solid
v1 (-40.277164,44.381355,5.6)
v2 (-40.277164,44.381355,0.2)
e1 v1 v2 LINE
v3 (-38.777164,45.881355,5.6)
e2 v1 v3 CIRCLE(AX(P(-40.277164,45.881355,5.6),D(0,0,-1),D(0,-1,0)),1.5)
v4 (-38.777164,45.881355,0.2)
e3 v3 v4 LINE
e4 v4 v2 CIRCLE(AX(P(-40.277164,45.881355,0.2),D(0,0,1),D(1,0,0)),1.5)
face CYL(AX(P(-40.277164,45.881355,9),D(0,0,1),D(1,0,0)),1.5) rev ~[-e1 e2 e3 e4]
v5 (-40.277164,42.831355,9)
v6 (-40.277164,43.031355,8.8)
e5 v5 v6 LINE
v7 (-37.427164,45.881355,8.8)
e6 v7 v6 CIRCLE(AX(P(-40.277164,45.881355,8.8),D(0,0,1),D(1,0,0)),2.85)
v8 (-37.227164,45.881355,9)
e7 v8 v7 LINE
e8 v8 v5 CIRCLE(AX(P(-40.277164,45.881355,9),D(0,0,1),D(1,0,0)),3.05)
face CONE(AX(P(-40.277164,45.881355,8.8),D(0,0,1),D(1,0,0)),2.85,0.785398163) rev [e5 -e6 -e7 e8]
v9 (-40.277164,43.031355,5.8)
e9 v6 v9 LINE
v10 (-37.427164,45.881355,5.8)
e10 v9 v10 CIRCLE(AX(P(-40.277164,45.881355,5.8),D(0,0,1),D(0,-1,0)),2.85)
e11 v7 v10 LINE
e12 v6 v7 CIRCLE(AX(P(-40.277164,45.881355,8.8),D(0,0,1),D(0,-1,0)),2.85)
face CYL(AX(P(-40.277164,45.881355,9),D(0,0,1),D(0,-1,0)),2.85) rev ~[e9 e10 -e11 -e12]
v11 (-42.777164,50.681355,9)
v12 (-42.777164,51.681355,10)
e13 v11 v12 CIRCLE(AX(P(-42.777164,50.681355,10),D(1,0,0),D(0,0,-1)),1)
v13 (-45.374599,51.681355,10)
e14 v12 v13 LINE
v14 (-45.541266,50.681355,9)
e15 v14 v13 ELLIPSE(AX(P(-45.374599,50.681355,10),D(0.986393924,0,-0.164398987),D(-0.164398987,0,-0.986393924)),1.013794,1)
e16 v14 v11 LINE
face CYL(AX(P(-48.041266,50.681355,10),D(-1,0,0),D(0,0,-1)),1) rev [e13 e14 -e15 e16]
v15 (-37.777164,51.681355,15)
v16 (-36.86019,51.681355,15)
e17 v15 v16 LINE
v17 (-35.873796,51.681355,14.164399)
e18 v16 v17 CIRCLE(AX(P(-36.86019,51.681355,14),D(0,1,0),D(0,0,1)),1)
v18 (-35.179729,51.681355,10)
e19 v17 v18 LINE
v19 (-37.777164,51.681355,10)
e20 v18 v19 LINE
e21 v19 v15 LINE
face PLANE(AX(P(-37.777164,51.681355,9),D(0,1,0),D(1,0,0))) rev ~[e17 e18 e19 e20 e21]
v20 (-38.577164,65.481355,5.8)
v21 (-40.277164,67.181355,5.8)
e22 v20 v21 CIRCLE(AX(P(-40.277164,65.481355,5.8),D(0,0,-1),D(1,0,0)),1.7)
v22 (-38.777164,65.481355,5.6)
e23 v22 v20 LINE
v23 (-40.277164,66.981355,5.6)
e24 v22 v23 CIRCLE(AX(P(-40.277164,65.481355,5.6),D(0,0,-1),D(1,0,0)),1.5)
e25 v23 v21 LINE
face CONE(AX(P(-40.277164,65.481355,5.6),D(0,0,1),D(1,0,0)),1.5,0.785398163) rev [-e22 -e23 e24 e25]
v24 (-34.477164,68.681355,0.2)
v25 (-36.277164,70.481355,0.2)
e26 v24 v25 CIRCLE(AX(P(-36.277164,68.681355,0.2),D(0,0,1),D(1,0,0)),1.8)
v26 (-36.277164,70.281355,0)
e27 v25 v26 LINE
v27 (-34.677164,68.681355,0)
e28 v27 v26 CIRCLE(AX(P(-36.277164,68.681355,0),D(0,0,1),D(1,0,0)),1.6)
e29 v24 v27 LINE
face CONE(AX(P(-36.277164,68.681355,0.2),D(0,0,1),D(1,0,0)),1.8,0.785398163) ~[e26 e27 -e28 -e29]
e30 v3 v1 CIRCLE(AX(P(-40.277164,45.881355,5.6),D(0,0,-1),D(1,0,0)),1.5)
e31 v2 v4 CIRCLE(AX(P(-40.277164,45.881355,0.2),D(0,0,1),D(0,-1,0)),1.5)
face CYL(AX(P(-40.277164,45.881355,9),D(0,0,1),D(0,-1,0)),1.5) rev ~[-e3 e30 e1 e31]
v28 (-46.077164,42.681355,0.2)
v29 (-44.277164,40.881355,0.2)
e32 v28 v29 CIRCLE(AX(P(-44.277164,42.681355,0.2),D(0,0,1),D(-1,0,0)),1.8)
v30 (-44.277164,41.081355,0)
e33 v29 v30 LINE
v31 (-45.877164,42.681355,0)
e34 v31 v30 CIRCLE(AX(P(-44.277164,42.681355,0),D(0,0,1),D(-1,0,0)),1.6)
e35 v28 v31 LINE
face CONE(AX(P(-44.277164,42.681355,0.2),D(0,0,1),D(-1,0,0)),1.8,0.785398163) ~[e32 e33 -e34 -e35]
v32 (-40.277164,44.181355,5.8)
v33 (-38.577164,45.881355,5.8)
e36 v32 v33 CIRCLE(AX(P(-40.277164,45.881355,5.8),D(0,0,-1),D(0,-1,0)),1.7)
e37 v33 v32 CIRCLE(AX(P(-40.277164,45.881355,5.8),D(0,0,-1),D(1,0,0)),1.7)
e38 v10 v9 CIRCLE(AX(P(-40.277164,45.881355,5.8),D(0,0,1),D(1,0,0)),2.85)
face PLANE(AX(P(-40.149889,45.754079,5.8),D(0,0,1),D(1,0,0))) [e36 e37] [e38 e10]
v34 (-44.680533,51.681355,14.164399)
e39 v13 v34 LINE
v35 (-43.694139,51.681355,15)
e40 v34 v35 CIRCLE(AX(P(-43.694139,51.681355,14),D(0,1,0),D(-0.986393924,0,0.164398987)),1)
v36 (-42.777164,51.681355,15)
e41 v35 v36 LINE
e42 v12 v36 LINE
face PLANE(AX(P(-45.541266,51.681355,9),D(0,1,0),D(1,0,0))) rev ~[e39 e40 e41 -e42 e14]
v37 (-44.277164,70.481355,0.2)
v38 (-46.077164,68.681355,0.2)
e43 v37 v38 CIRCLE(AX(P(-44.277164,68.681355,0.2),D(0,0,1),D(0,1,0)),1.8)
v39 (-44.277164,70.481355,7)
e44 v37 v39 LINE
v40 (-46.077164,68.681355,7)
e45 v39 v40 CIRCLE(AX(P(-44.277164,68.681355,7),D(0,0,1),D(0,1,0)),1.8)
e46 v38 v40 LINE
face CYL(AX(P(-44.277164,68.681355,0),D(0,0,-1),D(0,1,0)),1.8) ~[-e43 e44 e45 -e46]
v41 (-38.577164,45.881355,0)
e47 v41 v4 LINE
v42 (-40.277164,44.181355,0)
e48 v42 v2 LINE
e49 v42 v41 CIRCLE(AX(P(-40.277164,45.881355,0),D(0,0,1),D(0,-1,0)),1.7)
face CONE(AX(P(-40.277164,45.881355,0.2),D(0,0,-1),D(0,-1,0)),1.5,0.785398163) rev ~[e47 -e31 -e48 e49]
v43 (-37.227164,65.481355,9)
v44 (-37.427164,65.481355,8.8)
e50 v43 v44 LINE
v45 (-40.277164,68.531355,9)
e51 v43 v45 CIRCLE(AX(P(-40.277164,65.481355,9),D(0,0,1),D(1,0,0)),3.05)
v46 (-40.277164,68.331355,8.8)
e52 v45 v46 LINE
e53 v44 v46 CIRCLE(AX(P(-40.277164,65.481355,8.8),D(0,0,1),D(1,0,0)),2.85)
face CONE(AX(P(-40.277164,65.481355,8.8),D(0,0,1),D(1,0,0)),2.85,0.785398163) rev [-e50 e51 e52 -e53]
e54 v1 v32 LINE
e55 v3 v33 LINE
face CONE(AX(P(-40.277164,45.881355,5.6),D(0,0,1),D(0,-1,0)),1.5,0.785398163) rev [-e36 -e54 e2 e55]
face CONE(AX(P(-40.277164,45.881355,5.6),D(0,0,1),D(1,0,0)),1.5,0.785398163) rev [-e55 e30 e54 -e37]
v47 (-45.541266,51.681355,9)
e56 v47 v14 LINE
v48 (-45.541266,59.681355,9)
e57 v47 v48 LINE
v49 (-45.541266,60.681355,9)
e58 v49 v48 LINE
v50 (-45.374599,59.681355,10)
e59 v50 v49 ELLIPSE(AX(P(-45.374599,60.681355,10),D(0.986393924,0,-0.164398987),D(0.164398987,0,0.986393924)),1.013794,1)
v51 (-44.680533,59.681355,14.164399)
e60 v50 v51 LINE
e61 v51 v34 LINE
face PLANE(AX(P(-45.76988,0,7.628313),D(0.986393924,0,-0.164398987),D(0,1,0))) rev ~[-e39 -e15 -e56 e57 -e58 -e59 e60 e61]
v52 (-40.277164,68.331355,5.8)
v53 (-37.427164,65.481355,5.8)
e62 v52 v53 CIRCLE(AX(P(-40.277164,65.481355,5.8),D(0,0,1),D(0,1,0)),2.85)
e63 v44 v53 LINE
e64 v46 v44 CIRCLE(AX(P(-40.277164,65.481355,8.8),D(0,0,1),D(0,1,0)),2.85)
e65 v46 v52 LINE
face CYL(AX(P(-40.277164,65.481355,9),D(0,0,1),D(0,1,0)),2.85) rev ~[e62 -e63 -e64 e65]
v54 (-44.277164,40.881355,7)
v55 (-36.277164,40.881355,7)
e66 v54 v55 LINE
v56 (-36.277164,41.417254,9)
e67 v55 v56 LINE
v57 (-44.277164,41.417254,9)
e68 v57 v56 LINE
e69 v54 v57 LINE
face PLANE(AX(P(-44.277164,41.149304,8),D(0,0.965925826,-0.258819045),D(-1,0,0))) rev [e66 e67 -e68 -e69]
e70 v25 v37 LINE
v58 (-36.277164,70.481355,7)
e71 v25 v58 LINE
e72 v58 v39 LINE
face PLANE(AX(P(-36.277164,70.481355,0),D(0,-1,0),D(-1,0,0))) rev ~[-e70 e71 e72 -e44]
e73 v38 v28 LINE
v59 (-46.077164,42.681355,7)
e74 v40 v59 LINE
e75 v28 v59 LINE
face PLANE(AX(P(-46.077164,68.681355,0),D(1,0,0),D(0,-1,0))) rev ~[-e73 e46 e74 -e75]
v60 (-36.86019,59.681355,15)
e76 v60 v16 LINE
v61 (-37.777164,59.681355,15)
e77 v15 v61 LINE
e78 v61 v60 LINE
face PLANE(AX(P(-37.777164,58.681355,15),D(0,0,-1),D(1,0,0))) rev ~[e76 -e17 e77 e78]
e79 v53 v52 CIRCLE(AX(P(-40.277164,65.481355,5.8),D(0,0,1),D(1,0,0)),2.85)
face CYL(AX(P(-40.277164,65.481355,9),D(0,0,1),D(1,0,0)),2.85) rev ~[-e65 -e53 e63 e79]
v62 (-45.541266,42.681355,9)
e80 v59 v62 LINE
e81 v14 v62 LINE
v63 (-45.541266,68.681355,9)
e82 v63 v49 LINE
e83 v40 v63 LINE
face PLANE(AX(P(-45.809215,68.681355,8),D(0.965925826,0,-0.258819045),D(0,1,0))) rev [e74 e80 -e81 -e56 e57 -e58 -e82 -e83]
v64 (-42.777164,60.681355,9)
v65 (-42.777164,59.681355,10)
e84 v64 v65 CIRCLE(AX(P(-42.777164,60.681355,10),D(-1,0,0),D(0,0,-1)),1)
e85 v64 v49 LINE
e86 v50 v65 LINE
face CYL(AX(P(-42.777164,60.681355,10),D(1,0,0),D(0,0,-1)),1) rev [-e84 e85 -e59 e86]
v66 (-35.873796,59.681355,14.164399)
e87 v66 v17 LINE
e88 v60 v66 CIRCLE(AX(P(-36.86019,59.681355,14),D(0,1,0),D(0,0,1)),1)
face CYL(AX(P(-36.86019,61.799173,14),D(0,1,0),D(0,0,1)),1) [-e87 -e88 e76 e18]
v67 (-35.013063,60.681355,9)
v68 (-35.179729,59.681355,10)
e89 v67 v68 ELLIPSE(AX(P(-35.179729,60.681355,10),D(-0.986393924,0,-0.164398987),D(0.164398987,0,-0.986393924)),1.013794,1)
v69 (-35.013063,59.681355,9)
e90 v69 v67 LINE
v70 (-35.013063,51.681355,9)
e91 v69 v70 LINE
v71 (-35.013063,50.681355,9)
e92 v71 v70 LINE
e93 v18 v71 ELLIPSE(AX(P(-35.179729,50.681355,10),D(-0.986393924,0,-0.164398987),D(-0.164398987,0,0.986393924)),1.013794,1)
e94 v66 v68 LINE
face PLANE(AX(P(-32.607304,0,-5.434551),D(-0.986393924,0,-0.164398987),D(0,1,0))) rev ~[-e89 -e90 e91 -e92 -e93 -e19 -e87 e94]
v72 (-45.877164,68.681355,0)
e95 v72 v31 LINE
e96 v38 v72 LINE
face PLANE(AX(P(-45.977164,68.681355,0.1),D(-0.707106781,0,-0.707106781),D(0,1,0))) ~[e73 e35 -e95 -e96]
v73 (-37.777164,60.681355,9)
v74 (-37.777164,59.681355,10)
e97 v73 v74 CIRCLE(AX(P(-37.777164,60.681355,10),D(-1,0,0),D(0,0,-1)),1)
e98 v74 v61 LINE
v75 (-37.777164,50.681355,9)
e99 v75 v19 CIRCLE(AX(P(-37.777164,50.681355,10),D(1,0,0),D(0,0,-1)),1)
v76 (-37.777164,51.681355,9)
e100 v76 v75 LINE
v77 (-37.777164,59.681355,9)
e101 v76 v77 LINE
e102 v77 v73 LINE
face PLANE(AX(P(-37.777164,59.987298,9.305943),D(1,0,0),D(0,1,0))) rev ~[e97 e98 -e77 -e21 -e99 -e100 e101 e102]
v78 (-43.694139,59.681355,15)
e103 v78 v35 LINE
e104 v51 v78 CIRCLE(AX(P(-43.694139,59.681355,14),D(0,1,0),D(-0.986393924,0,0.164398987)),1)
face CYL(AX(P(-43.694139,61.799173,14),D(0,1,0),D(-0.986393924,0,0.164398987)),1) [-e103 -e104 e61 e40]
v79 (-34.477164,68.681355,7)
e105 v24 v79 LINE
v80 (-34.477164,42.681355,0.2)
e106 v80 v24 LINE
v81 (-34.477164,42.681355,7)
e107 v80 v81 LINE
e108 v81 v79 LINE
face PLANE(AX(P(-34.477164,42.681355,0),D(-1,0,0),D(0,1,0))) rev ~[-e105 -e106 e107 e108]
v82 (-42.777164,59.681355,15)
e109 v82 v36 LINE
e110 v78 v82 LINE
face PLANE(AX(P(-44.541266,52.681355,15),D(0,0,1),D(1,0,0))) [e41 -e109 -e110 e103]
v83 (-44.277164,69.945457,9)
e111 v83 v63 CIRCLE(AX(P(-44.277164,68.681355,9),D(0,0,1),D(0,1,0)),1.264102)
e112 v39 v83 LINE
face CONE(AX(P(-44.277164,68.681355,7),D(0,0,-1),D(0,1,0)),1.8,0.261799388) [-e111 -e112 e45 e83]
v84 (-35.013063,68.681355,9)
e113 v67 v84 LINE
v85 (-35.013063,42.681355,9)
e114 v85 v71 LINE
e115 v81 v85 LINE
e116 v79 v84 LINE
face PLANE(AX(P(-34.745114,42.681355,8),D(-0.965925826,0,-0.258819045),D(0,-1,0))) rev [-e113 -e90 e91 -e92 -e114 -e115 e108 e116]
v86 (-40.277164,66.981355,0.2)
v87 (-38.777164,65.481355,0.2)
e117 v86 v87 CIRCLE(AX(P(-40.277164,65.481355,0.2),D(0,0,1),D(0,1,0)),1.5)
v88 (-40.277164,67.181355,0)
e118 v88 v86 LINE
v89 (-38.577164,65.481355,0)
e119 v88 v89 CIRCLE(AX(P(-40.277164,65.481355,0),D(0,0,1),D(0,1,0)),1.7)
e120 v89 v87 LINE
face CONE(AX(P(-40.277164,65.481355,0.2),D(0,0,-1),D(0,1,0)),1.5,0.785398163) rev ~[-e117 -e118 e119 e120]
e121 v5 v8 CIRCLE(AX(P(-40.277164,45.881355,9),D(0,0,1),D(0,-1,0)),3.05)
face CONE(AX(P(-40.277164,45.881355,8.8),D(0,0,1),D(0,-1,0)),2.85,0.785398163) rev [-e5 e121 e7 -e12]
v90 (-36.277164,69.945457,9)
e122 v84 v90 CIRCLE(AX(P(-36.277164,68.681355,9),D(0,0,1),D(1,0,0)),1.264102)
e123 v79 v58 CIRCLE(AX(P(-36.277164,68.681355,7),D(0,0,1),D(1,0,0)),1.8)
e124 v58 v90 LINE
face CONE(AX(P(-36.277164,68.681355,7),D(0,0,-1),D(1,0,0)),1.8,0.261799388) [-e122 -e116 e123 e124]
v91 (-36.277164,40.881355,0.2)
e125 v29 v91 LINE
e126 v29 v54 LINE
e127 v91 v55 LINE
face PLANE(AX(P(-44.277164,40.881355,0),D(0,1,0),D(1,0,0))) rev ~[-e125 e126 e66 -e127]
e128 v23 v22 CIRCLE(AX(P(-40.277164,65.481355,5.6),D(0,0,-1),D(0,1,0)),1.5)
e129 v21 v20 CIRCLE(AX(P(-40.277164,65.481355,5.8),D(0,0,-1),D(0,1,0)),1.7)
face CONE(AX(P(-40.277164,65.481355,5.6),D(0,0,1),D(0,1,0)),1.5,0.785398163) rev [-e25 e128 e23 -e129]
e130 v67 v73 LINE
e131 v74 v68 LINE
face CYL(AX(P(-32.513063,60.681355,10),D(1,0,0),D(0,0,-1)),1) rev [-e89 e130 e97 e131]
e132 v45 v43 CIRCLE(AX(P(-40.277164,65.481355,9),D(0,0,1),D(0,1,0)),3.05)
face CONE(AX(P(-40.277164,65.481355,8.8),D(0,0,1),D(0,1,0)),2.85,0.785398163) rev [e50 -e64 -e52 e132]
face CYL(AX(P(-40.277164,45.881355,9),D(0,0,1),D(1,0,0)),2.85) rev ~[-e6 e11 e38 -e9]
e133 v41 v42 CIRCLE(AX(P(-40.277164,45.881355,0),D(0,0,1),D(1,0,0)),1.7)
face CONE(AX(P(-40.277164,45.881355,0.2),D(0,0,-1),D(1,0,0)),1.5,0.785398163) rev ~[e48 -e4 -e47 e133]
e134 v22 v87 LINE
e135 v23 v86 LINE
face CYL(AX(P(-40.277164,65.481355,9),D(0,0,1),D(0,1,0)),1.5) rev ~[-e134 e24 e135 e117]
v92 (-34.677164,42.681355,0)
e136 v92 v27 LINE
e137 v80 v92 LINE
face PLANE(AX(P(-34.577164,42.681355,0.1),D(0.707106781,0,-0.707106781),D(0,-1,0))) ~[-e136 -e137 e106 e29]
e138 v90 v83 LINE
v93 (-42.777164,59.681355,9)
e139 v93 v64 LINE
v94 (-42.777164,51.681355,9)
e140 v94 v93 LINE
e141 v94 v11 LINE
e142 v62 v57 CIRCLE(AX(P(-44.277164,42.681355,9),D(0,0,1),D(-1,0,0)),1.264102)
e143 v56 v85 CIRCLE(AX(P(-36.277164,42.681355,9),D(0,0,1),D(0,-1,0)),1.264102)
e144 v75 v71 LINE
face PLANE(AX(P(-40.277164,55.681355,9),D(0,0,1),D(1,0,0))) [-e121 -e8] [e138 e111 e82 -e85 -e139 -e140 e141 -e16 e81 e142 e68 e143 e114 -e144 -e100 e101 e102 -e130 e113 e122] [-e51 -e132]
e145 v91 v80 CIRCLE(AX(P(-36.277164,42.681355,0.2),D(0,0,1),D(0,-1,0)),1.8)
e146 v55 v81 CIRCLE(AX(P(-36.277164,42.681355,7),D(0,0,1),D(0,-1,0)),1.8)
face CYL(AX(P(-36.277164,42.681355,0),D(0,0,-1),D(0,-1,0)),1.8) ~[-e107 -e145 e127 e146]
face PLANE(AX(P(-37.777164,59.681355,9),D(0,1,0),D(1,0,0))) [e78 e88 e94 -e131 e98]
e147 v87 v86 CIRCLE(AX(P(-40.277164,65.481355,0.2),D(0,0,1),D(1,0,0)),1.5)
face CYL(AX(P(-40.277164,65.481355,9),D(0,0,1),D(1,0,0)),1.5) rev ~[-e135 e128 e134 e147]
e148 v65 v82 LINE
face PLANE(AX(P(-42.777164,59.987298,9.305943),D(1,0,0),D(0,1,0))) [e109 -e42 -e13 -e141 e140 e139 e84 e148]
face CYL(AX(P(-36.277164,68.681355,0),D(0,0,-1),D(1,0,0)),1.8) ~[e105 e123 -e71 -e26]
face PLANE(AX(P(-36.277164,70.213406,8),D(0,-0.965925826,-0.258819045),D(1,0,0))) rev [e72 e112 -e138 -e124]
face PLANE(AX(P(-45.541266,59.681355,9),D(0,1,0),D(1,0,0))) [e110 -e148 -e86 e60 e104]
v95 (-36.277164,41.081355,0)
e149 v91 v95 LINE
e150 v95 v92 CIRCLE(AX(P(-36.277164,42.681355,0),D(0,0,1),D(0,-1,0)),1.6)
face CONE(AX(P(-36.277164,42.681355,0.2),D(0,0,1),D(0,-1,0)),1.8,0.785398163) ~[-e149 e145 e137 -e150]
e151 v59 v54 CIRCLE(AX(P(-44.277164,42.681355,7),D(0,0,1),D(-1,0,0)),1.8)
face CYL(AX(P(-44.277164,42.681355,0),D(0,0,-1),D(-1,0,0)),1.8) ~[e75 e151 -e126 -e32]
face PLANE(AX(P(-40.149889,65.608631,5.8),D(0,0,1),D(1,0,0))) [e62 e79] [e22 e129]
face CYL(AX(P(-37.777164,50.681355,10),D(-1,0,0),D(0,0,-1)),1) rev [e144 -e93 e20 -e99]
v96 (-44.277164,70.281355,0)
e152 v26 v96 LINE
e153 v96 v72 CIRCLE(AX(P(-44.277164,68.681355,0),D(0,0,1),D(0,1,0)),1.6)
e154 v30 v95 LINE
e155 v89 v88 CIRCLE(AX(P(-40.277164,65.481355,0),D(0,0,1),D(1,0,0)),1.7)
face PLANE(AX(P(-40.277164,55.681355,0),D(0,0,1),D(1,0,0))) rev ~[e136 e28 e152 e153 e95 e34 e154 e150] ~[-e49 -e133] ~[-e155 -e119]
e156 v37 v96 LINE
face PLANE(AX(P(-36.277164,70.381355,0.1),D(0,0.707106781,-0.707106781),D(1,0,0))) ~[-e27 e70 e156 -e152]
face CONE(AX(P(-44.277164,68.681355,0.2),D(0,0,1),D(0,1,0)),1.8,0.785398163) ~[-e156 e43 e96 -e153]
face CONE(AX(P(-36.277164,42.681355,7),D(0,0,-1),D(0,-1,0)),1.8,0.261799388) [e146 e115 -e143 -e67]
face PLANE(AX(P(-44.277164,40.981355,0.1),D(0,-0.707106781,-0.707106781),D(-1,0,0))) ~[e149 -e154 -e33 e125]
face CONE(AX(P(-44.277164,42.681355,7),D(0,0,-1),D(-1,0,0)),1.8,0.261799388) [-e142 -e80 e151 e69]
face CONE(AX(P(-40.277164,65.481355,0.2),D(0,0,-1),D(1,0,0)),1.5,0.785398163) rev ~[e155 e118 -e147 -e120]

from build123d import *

# Parameters (mm, degrees)
F1_DEPTH      = 9
F3_DEPTH      = 25
F4_DEPTH      = 3.2
F5_SIZE       = 0.2
F6_SIZE2      = 0.5358983849
F6_SIZE       = 2
F7_W          = 2.7641016151
F7_H          = 6
F8_DEPTH      = 6
F9_T4_DEPTH   = 37.1842967295
F9_T9_DEPTH   = 37.1842967295
F10_DEPTH     = 1
F11_DEPTH     = 1
F12_T4_DEPTH  = 5.2641016151
F12_T10_DEPTH = 5.2641016151
F12_T16_DEPTH = 5.2641016151
F12_T22_DEPTH = 5.2641016151
F12_T28_DEPTH = 5.2641016151
F12_T34_DEPTH = 5.2641016151
F12_T40_DEPTH = 5.2641016151
F12_T46_DEPTH = 5.2641016151
F12_T49_DEPTH = 12.2356354419


# Not quite as in the source:
# - a fillet or chamfer that OpenCascade refuses, or shapes differently, is made with other operations: its cross-section is extruded or revolved along the edge and cut away or added


with BuildPart() as f1:
    # F0 (on Top) → F1 (new body)
    with BuildSketch(Plane.XY):
        with BuildLine():
            Line((-34.4771644294, 42.6813552976), (-34.4771644294, 68.6813552976))
            ThreePointArc((-34.4771644294, 68.6813552976), (-35.0043722233, 69.9541475037), (-36.2771644294, 70.4813552976))
            Line((-36.2771644294, 70.4813552976), (-44.2771644294, 70.4813552976))
            ThreePointArc((-44.2771644294, 70.4813552976), (-45.5499566356, 69.9541475037), (-46.0771644294, 68.6813552976))
            Line((-46.0771644294, 68.6813552976), (-46.0771644294, 42.6813552976))
            ThreePointArc((-46.0771644294, 42.6813552976), (-45.5499566356, 41.4085630914), (-44.2771644294, 40.8813552976))
            Line((-44.2771644294, 40.8813552976), (-36.2771644294, 40.8813552976))
            ThreePointArc((-36.2771644294, 40.8813552976), (-35.0043722233, 41.4085630914), (-34.4771644294, 42.6813552976))
        make_face()
    extrude(amount=F1_DEPTH)

    # F2 (on face) → F3 (cut)
    with BuildSketch(Plane.XY.offset(9)):
        with BuildLine():
            ThreePointArc((-38.7771644294, 65.4813552976), (-39.2165042576, 66.5420154693), (-40.2771644294, 66.9813552976))
            ThreePointArc((-40.2771644294, 66.9813552976), (-41.3378246012, 64.4206951258), (-38.7771644294, 65.4813552976))
        make_face()
        with BuildLine():
            ThreePointArc((-38.7771644294, 45.8813552976), (-41.3378246012, 46.9420154693), (-40.2771644294, 44.3813552976))
            ThreePointArc((-40.2771644294, 44.3813552976), (-39.2165042576, 44.8206951258), (-38.7771644294, 45.8813552976))
        make_face()
    extrude(amount=-F3_DEPTH, mode=Mode.SUBTRACT)

    # F2 (on face) → F4 (cut)
    with BuildSketch(Plane.XY.offset(9)):
        with BuildLine():
            ThreePointArc((-37.4271644294, 65.4813552976), (-38.261910103, 67.4966096239), (-40.2771644294, 68.3313552976))
            ThreePointArc((-40.2771644294, 68.3313552976), (-42.2924187558, 63.4661009712), (-37.4271644294, 65.4813552976))
        make_face()
        with BuildLine():
            ThreePointArc((-38.7771644294, 65.4813552976), (-41.3378246012, 64.4206951258), (-40.2771644294, 66.9813552976))
            ThreePointArc((-40.2771644294, 66.9813552976), (-39.2165042576, 66.5420154693), (-38.7771644294, 65.4813552976))
        make_face(mode=Mode.SUBTRACT)
        with BuildLine():
            ThreePointArc((-37.4271644294, 45.8813552976), (-42.2924187558, 47.8966096239), (-40.2771644294, 43.0313552976))
            ThreePointArc((-40.2771644294, 43.0313552976), (-38.261910103, 43.8661009712), (-37.4271644294, 45.8813552976))
        make_face()
        with BuildLine():
            ThreePointArc((-38.7771644294, 45.8813552976), (-39.2165042576, 44.8206951258), (-40.2771644294, 44.3813552976))
            ThreePointArc((-40.2771644294, 44.3813552976), (-41.3378246012, 46.9420154693), (-38.7771644294, 45.8813552976))
        make_face(mode=Mode.SUBTRACT)
    extrude(amount=-F4_DEPTH, mode=Mode.SUBTRACT)

    # F5
    f5_edges = [f1.edges().sort_by_distance(p)[0] for p in [
        (-40.277164, 63.981355, 5.8),
        (-40.277164, 47.381355, 5.8),
        (-34.477164, 55.681355, 0),
        (-35.004372, 41.408563, 0),
        (-35.004372, 69.954148, 0),
        (-40.277164, 40.881355, 0),
        (-40.277164, 70.481355, 0),
        (-45.549957, 41.408563, 0),
        (-45.549957, 69.954148, 0),
        (-46.077164, 55.681355, 0),
        (-40.277164, 47.381355, 0),
        (-40.277164, 63.981355, 0),
        (-40.277164, 62.631355, 9),
        (-40.277164, 48.731355, 9),
    ]]
    chamfer(f5_edges, length=F5_SIZE)

    # F6
    f6_edges = [f1.edges().sort_by_distance(p)[0] for p in [
        (-34.477164, 55.681355, 9),
    ]]
    f6_side = f1.faces().sort_by_distance((-34.477164, 55.681355, 4.6))[0]
    chamfer(f6_edges, length=F6_SIZE, length2=F6_SIZE2, reference=f6_side)

    # F7 (on face) → F8 (join)
    with BuildSketch(Plane.XY.offset(9)):
        with Locations((-36.3951136219, 55.6813552976)):
            Rectangle(F7_W, F7_H)
        with Locations((-44.159215237, 55.6813552976)):
            Rectangle(F7_W, F7_H)
    extrude(amount=F8_DEPTH)

    # F9: chamfer of 1 x 6 on 2 edges, made by hand


with BuildPart() as f9_tool2:
    # F9_s3 → F9_t4 (new body)
    with BuildSketch(Plane.XZ.offset(-37.0892069328)):
        Polygon((-35.0130628143, 9), (-36.0130628143, 15), (-35.0130628143, 15), align=None)
    extrude(amount=-F9_T4_DEPTH)

    split(bisect_by=Plane(origin=(-30.4176323379, 0, -8.1503800206), x_dir=(0, 1, 0), z_dir=(0.9659258263, 0, 0.2588190451)), keep=Keep.TOP)


with BuildPart() as f1_1:
    add(f1.part)

    # F9_t1: cut F9_tool2
    add(f9_tool2.part, mode=Mode.SUBTRACT)


with BuildPart() as f9_tool7:
    # F9_s8 → F9_t9 (new body)
    with BuildSketch(Plane.XZ.offset(-74.2735036623)):
        Polygon((-45.5412660446, 9), (-44.5412660446, 15), (-45.5412660446, 15), align=None)
    extrude(amount=F9_T9_DEPTH)

    split(bisect_by=Plane(origin=(-44.7405796798, 0, 11.9882021941), x_dir=(0, 1, 0), z_dir=(-0.9659258263, 0, 0.2588190451)), keep=Keep.TOP)


with BuildPart() as f1_2:
    add(f1_1.part)

    # F9_t6: cut F9_tool7
    add(f9_tool7.part, mode=Mode.SUBTRACT)

    # F10 (add): faces of the model
    f10_faces = [f1_2.faces().sort_by_distance(p)[0] for p in [
        (-36.6267104431, 58.6813552976, 11.7791618553),
        (-43.9276184157, 58.6813552976, 11.7791618553),
    ]]
    extrude(f10_faces, amount=F10_DEPTH)

    # F11 (add): faces of the model
    f11_faces = [f1_2.faces().sort_by_distance(p)[0] for p in [
        (-43.9276184157, 52.6813552976, 11.7791618553),
        (-36.6267104431, 52.6813552976, 11.7791618553),
    ]]
    extrude(f11_faces, amount=F11_DEPTH)

    # F12: fillet of radius 1 on 6 edges, made by hand


with BuildPart() as f12_tool2:
    # F12_s3 → F12_t4 (new body)
    with BuildSketch(Plane.YZ.offset(-37.7771644294)):
        with BuildLine():
            ThreePointArc((50.6813552976, 9), (51.3884620788, 9.2928932188), (51.6813552976, 10))
            Line((51.6813552976, 10), (51.6813552976, 9))
            Line((51.6813552976, 9), (50.6813552976, 9))
        make_face()
    extrude(amount=F12_T4_DEPTH)

    split(bisect_by=Plane(origin=(-30.4176323379, 0, -8.1503800206), x_dir=(0, 1, 0), z_dir=(-0.9659258263, 0, -0.2588190451)), keep=Keep.TOP)

    split(bisect_by=Plane(origin=(-32.6073043599, 0, -5.4345507266), x_dir=(0, 1, 0), z_dir=(-0.9863939238, 0, -0.1643989873)), keep=Keep.TOP)


with BuildPart() as f1_3:
    add(f1_2.part)

    # F12_t1: union F12_tool2
    add(f12_tool2.part)


with BuildPart() as f12_tool8:
    # F12_s9 → F12_t10 (new body)
    with BuildSketch(Plane.YZ.offset(-37.7771644294)):
        with BuildLine():
            ThreePointArc((50.6813552976, 9), (51.3884620788, 9.2928932188), (51.6813552976, 10))
            Line((51.6813552976, 10), (51.6813552976, 9))
            Line((51.6813552976, 9), (50.6813552976, 9))
        make_face()
    extrude(amount=F12_T10_DEPTH)

    split(bisect_by=Plane(origin=(-30.4176323379, 0, -8.1503800206), x_dir=(0, 1, 0), z_dir=(0.9659258263, 0, 0.2588190451)), keep=Keep.TOP)

    split(bisect_by=Plane(origin=(-32.6073043599, 0, -5.4345507266), x_dir=(0, 1, 0), z_dir=(-0.9863939238, 0, -0.1643989873)), keep=Keep.TOP)


with BuildPart() as f1_4:
    add(f1_3.part)

    # F12_t7: union F12_tool8
    add(f12_tool8.part)


with BuildPart() as f12_tool14:
    # F12_s15 → F12_t16 (new body)
    with BuildSketch(Plane.YZ.offset(-48.0412660446)):
        with BuildLine():
            ThreePointArc((50.6813552976, 9), (51.3884620788, 9.2928932188), (51.6813552976, 10))
            Line((51.6813552976, 10), (51.6813552976, 9))
            Line((51.6813552976, 9), (50.6813552976, 9))
        make_face()
    extrude(amount=F12_T16_DEPTH)

    split(bisect_by=Plane(origin=(-44.7405796798, 0, 11.9882021941), x_dir=(0, 1, 0), z_dir=(-0.9659258263, 0, 0.2588190451)), keep=Keep.TOP)

    split(bisect_by=Plane(origin=(-45.7698804758, 0, 7.6283134126), x_dir=(0, 1, 0), z_dir=(0.9863939238, 0, -0.1643989873)), keep=Keep.TOP)


with BuildPart() as f1_5:
    add(f1_4.part)

    # F12_t13: union F12_tool14
    add(f12_tool14.part)


with BuildPart() as f12_tool20:
    # F12_s21 → F12_t22 (new body)
    with BuildSketch(Plane.YZ.offset(-48.0412660446)):
        with BuildLine():
            ThreePointArc((50.6813552976, 9), (51.3884620788, 9.2928932188), (51.6813552976, 10))
            Line((51.6813552976, 10), (51.6813552976, 9))
            Line((51.6813552976, 9), (50.6813552976, 9))
        make_face()
    extrude(amount=F12_T22_DEPTH)

    split(bisect_by=Plane(origin=(-44.7405796798, 0, 11.9882021941), x_dir=(0, 1, 0), z_dir=(0.9659258263, 0, -0.2588190451)), keep=Keep.TOP)

    split(bisect_by=Plane(origin=(-45.7698804758, 0, 7.6283134126), x_dir=(0, 1, 0), z_dir=(0.9863939238, 0, -0.1643989873)), keep=Keep.TOP)


with BuildPart() as f1_6:
    add(f1_5.part)

    # F12_t19: union F12_tool20
    add(f12_tool20.part)


with BuildPart() as f12_tool26:
    # F12_s27 → F12_t28 (new body)
    with BuildSketch(Plane.YZ.offset(-32.5130628143)):
        with BuildLine():
            ThreePointArc((60.6813552976, 9), (59.9742485164, 9.2928932188), (59.6813552976, 10))
            Line((59.6813552976, 10), (59.6813552976, 9))
            Line((59.6813552976, 9), (60.6813552976, 9))
        make_face()
    extrude(amount=-F12_T28_DEPTH)

    split(bisect_by=Plane(origin=(-30.4176323379, 0, -8.1503800206), x_dir=(0, 1, 0), z_dir=(0.9659258263, 0, 0.2588190451)), keep=Keep.TOP)

    split(bisect_by=Plane(origin=(-32.6073043599, 0, -5.4345507266), x_dir=(0, 1, 0), z_dir=(-0.9863939238, 0, -0.1643989873)), keep=Keep.TOP)


with BuildPart() as f1_7:
    add(f1_6.part)

    # F12_t25: union F12_tool26
    add(f12_tool26.part)


with BuildPart() as f12_tool32:
    # F12_s33 → F12_t34 (new body)
    with BuildSketch(Plane.YZ.offset(-32.5130628143)):
        with BuildLine():
            ThreePointArc((60.6813552976, 9), (59.9742485164, 9.2928932188), (59.6813552976, 10))
            Line((59.6813552976, 10), (59.6813552976, 9))
            Line((59.6813552976, 9), (60.6813552976, 9))
        make_face()
    extrude(amount=-F12_T34_DEPTH)

    split(bisect_by=Plane(origin=(-30.4176323379, 0, -8.1503800206), x_dir=(0, 1, 0), z_dir=(-0.9659258263, 0, -0.2588190451)), keep=Keep.TOP)

    split(bisect_by=Plane(origin=(-32.6073043599, 0, -5.4345507266), x_dir=(0, 1, 0), z_dir=(-0.9863939238, 0, -0.1643989873)), keep=Keep.TOP)


with BuildPart() as f1_8:
    add(f1_7.part)

    # F12_t31: union F12_tool32
    add(f12_tool32.part)


with BuildPart() as f12_tool38:
    # F12_s39 → F12_t40 (new body)
    with BuildSketch(Plane.YZ.offset(-42.7771644294)):
        with BuildLine():
            ThreePointArc((60.6813552976, 9), (59.9742485164, 9.2928932188), (59.6813552976, 10))
            Line((59.6813552976, 10), (59.6813552976, 9))
            Line((59.6813552976, 9), (60.6813552976, 9))
        make_face()
    extrude(amount=-F12_T40_DEPTH)

    split(bisect_by=Plane(origin=(-44.7405796798, 0, 11.9882021941), x_dir=(0, 1, 0), z_dir=(0.9659258263, 0, -0.2588190451)), keep=Keep.TOP)

    split(bisect_by=Plane(origin=(-45.7698804758, 0, 7.6283134126), x_dir=(0, 1, 0), z_dir=(0.9863939238, 0, -0.1643989873)), keep=Keep.TOP)


with BuildPart() as f1_9:
    add(f1_8.part)

    # F12_t37: union F12_tool38
    add(f12_tool38.part)


with BuildPart() as f12_tool44:
    # F12_s45 → F12_t46 (new body)
    with BuildSketch(Plane.YZ.offset(-42.7771644294)):
        with BuildLine():
            ThreePointArc((60.6813552976, 9), (59.9742485164, 9.2928932188), (59.6813552976, 10))
            Line((59.6813552976, 10), (59.6813552976, 9))
            Line((59.6813552976, 9), (60.6813552976, 9))
        make_face()
    extrude(amount=-F12_T46_DEPTH)

    split(bisect_by=Plane(origin=(-44.7405796798, 0, 11.9882021941), x_dir=(0, 1, 0), z_dir=(-0.9659258263, 0, 0.2588190451)), keep=Keep.TOP)

    split(bisect_by=Plane(origin=(-45.7698804758, 0, 7.6283134126), x_dir=(0, 1, 0), z_dir=(0.9863939238, 0, -0.1643989873)), keep=Keep.TOP)


with BuildPart() as f1_10:
    add(f1_9.part)

    # F12_t43: union F12_tool44
    add(f12_tool44.part)

    # F12_s50 → F12_t49 (cut)
    with BuildSketch(Plane.XZ.offset(-61.7991730185)):
        with BuildLine():
            ThreePointArc((-36.8601899027, 15), (-36.2138150066, 14.7630199825), (-35.8737959789, 14.1643989873))
            Line((-35.8737959789, 14.1643989873), (-36.0130628143, 15))
            Line((-36.0130628143, 15), (-36.8601899027, 15))
        make_face()
        with BuildLine():
            ThreePointArc((-44.68053288, 14.1643989873), (-44.3405138523, 14.7630199825), (-43.6941389562, 15))
            Line((-43.6941389562, 15), (-44.5412660446, 15))
            Line((-44.5412660446, 15), (-44.68053288, 14.1643989873))
        make_face()
    extrude(amount=F12_T49_DEPTH, mode=Mode.SUBTRACT)


solid = f1_10.part
